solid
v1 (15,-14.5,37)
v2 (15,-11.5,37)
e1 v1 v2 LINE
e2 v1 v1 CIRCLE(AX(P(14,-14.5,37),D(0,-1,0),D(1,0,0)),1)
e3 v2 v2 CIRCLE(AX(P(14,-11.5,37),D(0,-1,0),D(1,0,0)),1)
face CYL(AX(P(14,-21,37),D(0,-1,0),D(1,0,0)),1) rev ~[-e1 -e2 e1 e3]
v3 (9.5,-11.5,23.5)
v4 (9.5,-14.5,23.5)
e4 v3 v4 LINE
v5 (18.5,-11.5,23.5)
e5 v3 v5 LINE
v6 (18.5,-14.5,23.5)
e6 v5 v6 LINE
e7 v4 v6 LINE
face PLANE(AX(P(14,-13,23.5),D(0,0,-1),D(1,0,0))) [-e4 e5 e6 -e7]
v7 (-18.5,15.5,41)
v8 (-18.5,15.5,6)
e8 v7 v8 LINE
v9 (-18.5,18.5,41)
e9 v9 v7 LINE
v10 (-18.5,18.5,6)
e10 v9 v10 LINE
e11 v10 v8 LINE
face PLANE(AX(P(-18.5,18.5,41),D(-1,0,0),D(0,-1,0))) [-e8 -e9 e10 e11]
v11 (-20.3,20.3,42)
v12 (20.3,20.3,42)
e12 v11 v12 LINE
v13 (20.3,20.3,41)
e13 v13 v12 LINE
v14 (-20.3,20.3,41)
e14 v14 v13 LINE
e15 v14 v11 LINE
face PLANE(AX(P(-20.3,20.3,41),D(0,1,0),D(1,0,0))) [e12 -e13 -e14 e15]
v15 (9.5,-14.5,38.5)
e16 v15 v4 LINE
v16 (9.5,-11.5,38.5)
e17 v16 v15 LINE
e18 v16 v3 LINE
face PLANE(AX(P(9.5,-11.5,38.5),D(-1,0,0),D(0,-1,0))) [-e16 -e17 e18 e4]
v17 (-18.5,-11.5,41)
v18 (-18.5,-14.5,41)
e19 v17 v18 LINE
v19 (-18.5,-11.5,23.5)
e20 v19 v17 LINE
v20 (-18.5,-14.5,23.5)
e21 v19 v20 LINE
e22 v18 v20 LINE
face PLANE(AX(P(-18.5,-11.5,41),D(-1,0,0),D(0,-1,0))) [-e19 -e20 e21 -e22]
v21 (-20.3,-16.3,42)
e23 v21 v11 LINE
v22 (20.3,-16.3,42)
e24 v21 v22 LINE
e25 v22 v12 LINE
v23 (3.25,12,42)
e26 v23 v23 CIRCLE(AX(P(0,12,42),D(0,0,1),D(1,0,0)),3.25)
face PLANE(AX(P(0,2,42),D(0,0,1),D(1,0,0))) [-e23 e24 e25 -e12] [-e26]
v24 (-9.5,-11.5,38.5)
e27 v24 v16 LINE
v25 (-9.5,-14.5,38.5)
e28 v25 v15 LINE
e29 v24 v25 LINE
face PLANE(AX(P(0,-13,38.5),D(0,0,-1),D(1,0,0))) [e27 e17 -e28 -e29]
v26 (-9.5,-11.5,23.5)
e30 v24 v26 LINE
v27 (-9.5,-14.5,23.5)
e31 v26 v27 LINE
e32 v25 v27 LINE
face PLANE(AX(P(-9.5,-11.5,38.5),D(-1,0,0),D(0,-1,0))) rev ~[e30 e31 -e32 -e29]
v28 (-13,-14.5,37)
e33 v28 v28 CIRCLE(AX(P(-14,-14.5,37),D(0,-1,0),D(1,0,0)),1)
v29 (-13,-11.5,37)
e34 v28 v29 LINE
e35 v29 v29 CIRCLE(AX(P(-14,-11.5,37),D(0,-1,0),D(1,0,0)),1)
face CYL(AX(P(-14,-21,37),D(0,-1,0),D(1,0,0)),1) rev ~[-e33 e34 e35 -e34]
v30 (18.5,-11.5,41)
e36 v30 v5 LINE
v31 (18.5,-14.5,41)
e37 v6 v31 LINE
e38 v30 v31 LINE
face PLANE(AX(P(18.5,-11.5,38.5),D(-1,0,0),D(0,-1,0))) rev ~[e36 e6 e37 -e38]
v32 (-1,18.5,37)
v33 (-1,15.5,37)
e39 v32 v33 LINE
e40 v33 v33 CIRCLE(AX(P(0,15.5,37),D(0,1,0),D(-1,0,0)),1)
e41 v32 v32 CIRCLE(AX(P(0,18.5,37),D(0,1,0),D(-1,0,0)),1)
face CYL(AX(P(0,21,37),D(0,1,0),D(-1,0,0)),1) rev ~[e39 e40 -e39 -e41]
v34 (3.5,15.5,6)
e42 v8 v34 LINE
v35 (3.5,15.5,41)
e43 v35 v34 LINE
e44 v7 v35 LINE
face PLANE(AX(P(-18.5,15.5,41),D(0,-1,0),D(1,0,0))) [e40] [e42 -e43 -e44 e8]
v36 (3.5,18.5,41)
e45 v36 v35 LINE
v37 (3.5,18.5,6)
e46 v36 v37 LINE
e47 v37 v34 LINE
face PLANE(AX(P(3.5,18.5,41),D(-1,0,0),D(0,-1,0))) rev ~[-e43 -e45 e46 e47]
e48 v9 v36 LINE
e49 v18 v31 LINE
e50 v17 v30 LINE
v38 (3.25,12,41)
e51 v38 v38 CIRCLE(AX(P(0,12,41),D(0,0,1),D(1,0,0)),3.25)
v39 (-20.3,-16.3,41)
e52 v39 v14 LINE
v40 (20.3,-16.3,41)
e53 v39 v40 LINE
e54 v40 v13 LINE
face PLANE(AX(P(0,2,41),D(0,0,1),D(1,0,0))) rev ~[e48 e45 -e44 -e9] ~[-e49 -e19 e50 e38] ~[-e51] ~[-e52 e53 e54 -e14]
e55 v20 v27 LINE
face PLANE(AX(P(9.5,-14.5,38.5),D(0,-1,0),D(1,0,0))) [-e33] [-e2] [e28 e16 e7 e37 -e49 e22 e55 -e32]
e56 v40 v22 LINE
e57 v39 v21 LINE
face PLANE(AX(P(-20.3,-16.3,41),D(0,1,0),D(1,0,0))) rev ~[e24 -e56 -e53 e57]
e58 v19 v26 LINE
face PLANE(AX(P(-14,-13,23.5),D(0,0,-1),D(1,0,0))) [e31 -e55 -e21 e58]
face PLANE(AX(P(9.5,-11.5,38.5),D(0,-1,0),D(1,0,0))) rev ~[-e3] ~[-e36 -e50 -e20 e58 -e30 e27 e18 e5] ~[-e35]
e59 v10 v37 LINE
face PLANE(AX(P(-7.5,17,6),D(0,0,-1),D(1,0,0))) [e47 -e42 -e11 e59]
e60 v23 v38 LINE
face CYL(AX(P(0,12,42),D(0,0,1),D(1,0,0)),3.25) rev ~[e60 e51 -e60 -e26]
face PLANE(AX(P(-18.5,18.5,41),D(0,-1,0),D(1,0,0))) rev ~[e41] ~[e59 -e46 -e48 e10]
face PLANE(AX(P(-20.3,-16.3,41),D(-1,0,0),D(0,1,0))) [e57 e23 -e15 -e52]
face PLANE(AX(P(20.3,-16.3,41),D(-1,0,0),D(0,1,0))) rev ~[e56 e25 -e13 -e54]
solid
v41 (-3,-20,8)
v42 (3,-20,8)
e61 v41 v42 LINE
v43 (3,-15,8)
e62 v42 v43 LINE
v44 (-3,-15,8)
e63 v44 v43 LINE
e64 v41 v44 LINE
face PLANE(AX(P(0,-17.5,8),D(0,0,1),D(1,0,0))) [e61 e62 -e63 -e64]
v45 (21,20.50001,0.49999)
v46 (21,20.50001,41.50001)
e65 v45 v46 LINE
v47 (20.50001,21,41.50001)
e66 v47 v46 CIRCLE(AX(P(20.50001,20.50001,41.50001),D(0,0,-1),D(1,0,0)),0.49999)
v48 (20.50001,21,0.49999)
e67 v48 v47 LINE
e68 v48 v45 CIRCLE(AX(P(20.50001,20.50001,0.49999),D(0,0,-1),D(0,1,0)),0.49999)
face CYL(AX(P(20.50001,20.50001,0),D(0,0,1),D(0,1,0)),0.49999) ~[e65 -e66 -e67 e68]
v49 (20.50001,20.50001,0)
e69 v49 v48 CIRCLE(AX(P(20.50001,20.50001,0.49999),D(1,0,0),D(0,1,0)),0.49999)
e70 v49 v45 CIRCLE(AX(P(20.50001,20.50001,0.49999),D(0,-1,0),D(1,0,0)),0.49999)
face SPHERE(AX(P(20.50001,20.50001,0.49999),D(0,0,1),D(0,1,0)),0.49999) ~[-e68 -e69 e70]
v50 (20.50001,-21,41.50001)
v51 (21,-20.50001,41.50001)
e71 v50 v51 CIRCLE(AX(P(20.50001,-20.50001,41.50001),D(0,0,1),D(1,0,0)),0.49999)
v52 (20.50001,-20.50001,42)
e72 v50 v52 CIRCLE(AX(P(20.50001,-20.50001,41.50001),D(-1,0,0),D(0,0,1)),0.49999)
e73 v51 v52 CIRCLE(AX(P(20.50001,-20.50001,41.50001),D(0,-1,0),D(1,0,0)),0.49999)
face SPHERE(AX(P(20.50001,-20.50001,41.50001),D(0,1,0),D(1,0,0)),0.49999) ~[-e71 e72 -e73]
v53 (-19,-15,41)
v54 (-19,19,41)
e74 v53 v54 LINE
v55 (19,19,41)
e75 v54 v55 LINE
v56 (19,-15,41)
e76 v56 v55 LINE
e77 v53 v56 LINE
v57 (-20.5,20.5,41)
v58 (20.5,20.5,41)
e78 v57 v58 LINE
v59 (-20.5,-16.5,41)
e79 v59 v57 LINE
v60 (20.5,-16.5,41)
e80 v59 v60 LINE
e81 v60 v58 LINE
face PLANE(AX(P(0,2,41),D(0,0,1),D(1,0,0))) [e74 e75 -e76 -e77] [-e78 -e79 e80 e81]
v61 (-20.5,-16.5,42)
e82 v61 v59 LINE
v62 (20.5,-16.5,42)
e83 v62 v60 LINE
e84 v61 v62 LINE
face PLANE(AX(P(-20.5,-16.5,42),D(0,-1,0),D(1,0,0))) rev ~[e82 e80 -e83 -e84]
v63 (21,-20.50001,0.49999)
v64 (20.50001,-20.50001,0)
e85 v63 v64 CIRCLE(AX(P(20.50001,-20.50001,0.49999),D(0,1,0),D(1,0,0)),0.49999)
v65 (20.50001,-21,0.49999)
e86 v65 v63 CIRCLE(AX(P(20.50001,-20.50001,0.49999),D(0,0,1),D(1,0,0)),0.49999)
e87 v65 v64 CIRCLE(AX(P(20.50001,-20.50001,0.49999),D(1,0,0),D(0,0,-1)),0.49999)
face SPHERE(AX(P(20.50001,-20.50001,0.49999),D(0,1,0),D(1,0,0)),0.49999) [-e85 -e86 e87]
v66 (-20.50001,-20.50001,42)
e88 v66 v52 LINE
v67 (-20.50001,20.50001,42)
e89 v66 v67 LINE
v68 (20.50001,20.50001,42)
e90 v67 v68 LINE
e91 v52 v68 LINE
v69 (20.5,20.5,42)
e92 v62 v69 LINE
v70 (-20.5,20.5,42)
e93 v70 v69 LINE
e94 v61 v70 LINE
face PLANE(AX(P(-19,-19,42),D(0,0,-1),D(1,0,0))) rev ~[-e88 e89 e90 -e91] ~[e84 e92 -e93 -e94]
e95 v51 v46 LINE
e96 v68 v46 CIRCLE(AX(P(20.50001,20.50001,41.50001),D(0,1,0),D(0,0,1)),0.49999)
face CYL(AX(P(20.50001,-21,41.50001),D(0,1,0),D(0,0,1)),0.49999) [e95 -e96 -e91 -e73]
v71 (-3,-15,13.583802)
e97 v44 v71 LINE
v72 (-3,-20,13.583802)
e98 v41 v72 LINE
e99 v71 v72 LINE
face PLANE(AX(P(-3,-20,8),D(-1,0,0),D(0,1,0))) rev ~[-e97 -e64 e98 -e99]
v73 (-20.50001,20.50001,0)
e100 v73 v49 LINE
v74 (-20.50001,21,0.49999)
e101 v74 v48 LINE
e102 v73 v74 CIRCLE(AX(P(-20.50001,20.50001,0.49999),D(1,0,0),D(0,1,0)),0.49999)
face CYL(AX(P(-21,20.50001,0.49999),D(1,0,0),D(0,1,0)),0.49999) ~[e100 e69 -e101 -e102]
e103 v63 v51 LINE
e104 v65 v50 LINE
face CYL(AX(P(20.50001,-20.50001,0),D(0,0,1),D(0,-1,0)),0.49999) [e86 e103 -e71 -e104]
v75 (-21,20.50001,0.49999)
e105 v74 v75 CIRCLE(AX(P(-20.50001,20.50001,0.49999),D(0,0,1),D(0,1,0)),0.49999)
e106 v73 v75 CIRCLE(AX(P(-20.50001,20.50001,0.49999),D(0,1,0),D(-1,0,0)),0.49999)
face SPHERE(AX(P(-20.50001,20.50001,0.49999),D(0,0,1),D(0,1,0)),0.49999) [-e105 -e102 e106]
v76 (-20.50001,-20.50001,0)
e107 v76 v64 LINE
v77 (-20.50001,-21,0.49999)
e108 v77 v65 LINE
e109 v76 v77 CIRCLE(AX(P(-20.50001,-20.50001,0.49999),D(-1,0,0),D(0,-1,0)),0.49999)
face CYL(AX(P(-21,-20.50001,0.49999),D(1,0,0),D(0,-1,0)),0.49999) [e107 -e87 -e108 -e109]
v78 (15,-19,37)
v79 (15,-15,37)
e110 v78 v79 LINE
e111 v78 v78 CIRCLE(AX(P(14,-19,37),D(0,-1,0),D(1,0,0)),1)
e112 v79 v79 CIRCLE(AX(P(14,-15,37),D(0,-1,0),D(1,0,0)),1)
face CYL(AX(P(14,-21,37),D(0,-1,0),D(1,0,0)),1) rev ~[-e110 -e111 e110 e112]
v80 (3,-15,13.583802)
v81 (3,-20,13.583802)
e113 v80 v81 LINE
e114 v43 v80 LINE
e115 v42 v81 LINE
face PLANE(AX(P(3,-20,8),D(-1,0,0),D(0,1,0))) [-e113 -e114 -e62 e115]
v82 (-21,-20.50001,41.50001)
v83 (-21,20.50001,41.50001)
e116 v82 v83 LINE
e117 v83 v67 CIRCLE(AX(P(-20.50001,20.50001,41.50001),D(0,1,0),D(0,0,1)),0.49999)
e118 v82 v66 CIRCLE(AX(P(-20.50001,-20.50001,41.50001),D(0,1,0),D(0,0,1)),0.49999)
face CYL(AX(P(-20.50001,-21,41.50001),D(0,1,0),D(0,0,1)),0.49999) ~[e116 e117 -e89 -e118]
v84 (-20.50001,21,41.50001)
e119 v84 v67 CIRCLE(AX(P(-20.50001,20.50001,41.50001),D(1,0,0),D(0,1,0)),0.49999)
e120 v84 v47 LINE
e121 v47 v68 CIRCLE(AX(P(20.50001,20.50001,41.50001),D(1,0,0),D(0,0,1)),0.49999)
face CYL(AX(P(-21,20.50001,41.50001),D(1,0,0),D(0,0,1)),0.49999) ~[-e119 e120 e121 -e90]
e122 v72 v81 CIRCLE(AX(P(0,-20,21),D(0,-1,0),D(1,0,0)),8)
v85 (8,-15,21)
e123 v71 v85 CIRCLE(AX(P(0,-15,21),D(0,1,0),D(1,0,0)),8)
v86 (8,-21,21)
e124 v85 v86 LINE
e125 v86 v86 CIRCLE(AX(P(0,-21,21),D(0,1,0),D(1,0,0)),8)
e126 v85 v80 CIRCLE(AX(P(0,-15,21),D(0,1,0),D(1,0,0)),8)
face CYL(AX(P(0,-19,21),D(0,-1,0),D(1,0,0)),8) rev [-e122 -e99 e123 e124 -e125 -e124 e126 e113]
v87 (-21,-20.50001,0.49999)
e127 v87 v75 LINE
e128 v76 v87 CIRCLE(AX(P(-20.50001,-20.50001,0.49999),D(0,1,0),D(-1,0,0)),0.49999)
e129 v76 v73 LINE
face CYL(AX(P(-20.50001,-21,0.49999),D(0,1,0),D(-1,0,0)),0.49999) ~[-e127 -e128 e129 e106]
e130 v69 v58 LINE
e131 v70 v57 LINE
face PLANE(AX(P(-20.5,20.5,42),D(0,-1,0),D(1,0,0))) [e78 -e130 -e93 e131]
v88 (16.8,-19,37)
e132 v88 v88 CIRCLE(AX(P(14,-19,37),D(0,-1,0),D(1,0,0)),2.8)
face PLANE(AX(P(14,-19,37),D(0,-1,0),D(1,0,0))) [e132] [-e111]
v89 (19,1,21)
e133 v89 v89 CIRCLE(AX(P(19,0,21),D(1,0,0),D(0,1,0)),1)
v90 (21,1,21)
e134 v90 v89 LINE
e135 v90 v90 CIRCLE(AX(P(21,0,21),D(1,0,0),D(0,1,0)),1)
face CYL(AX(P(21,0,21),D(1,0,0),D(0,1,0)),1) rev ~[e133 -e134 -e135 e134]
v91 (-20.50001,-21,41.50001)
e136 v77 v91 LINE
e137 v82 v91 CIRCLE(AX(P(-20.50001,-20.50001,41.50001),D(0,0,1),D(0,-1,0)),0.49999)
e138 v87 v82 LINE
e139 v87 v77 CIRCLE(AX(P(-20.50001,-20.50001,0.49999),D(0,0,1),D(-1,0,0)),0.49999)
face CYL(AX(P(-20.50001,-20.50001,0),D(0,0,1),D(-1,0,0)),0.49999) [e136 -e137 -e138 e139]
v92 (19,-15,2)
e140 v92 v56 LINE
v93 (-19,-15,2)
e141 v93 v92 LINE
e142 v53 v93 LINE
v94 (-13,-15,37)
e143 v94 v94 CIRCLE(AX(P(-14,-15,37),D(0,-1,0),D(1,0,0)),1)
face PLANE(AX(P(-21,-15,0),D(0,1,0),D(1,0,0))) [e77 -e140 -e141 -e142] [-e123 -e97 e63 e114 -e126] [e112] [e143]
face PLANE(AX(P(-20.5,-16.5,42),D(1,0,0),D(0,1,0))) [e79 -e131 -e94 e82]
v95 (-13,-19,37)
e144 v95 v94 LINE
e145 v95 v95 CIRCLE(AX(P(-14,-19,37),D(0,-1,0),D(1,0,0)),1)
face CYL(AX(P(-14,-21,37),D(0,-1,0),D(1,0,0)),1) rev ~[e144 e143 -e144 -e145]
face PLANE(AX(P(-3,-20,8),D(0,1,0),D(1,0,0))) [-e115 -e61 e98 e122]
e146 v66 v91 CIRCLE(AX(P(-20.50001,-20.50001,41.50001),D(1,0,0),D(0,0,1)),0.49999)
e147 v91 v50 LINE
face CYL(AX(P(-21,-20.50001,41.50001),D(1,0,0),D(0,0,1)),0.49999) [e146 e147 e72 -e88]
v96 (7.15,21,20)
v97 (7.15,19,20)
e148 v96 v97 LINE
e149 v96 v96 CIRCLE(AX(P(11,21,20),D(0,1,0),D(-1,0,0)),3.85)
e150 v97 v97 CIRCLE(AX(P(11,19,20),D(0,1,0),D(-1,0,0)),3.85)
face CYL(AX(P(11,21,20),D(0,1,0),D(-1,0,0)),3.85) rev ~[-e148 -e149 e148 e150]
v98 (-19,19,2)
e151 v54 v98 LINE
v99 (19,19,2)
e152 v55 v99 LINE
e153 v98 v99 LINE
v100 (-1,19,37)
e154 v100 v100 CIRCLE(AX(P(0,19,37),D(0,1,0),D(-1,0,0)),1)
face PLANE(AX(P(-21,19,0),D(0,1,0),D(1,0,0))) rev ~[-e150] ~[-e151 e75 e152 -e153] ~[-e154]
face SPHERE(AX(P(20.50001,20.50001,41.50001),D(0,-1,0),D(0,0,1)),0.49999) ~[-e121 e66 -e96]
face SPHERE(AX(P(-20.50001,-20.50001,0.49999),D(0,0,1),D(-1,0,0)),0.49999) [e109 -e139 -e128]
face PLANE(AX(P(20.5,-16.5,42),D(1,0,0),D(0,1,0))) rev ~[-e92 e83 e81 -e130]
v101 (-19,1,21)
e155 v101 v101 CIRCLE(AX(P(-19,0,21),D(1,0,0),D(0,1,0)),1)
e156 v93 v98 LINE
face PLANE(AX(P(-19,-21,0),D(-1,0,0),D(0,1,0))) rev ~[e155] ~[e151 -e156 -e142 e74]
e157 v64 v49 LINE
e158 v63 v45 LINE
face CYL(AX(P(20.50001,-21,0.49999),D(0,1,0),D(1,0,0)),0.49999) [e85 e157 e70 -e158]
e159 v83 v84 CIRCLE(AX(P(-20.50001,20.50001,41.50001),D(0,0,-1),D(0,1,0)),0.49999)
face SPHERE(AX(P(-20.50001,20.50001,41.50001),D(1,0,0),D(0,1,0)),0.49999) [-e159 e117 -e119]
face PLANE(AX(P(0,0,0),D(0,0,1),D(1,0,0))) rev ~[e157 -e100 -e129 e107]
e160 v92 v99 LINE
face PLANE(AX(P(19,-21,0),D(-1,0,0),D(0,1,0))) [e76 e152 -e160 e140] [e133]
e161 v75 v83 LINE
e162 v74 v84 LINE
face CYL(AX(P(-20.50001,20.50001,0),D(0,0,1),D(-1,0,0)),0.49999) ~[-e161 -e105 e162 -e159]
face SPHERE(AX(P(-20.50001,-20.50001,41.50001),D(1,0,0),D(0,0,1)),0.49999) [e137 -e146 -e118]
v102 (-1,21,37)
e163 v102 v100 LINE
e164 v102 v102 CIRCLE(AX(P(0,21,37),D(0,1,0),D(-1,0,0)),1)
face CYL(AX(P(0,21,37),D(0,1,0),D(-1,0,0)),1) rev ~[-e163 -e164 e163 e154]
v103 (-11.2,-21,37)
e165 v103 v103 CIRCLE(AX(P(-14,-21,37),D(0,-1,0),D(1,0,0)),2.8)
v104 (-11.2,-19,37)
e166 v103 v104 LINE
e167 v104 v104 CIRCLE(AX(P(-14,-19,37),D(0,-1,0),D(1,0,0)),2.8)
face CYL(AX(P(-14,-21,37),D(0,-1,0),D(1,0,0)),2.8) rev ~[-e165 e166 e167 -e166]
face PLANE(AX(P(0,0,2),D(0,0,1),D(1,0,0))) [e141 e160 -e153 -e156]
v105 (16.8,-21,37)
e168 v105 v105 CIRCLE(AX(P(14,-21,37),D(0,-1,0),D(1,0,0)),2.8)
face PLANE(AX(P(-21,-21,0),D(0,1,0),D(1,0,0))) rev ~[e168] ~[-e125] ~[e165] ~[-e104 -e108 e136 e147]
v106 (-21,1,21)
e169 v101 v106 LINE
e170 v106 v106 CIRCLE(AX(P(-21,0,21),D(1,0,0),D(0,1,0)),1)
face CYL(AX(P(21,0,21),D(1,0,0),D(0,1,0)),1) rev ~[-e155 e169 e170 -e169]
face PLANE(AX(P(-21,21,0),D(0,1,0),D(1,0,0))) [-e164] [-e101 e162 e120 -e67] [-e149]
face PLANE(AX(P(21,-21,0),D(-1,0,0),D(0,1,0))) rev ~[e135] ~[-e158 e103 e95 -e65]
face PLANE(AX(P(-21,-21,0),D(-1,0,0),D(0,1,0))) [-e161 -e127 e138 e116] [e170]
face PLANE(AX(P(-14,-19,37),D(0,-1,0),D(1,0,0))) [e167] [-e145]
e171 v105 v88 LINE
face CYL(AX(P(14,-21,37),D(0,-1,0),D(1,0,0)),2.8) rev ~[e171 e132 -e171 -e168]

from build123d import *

# Parameters (mm, degrees)
F0_W      = 42
F0_H      = 42
F1_DEPTH  = 42
F2_T      = -2
F3_R      = 8
F4_DEPTH  = 21.001
F5_DEPTH  = 4
F7_W      = 6
F7_H      = 5
F8_DEPTH  = 5.5848015129
F9_R      = 3.85
F10_DEPTH = 2
F11_W     = 41
F11_H     = 37
F12_DEPTH = 1
F13_W     = 40.6
F13_H     = 36.6
F14_DEPTH = 1
F15_W     = 22
F15_H     = 3
F16_DEPTH = 35
F17_W     = 37
F17_H     = 3
F18_DEPTH = 2.5
F19_W     = 9
F19_H     = 3
F20_DEPTH = 15
F21_R     = 1
F22_DEPTH = 10
F23_R     = 1
F24_DEPTH = 25
F25_R     = 2.8
F26_DEPTH = 2
F27_R     = 1
F28_DEPTH = 42.001
F29_R     = 3.25
F30_DEPTH = 1
F31_R     = 0.49999


# Not quite as in the source:
# - a fillet or chamfer is up to 0.001 mm smaller than in the source, because OpenCascade refuses the exact size


with BuildPart() as f1:
    # F0 (on Top) → F1 (new body)
    with BuildSketch(Plane.XY):
        Rectangle(F0_W, F0_H)
    extrude(amount=F1_DEPTH)

    # F2
    f2_openings = [f1.faces().sort_by_distance(p)[0] for p in [
        (0, 0, 42),
    ]]
    offset(amount=F2_T, openings=f2_openings)

    # F3 (on Front) → F4 (cut, through all)
    with BuildSketch(Plane.XZ):
        with Locations((0, 21)):
            Circle(F3_R)
    extrude(amount=F4_DEPTH, mode=Mode.SUBTRACT)

    # F5 (add): a face of the model
    f5_faces = [f1.faces().sort_by_distance(p)[0] for p in [
        (0, -19, 41.448275431),
    ]]
    extrude(f5_faces, amount=F5_DEPTH)

    # F7 (on offset) → F8 (cut, through all)
    with BuildSketch(Plane.XY.offset(8)):
        with Locations((0, -17.5)):
            Rectangle(F7_W, F7_H)
    extrude(amount=F8_DEPTH, mode=Mode.SUBTRACT)

    # F9 (on face) → F10 (cut, through all)
    with BuildSketch(Plane(origin=(0, 21, 0), x_dir=(-1, 0, 0), z_dir=(0, 1, 0))):
        with Locations((-11, 20)):
            Circle(F9_R)
    extrude(amount=-F10_DEPTH, mode=Mode.SUBTRACT)

    # F11 (on face) → F12 (cut)
    with BuildSketch(Plane.XY.offset(42)):
        with Locations((0, 2)):
            Rectangle(F11_W, F11_H)
    extrude(amount=-F12_DEPTH, mode=Mode.SUBTRACT)


with BuildPart() as f14:
    # F13 (on face) → F14 (new body, through all)
    with BuildSketch(Plane.XY.offset(41)):
        with Locations((0, 2)):
            Rectangle(F13_W, F13_H)
    extrude(amount=F14_DEPTH)

    # F15 (on face) → F16 (join)
    with BuildSketch(Plane(origin=(0, 0, 41), x_dir=(1, 0, 0), z_dir=(0, 0, -1))):
        with Locations((-7.5, -17)):
            Rectangle(F15_W, F15_H)
    extrude(amount=F16_DEPTH)

    # F17 (on face) → F18 (join)
    with BuildSketch(Plane(origin=(0, 0, 41), x_dir=(1, 0, 0), z_dir=(0, 0, -1))):
        with Locations((0, 13)):
            Rectangle(F17_W, F17_H)
    extrude(amount=F18_DEPTH)

    # F19 (on face) → F20 (join)
    with BuildSketch(Plane(origin=(0, 0, 38.5), x_dir=(1, 0, 0), z_dir=(0, 0, -1))):
        with Locations((14, 13)):
            Rectangle(F19_W, F19_H)
        with Locations((-14, 13)):
            Rectangle(F19_W, F19_H)
    extrude(amount=F20_DEPTH)


with BuildPart() as f22_tool:
    # F21 (on face) → F22 (new body)
    with BuildSketch(Plane(origin=(0, 21, 0), x_dir=(-1, 0, 0), z_dir=(0, 1, 0))):
        with Locations((0, 37)):
            Circle(F21_R)
    extrude(amount=-F22_DEPTH)


with BuildPart() as f1_1:
    add(f1.part)

    # F22: cut by f22_tool
    add(f22_tool.part, mode=Mode.SUBTRACT)


with BuildPart() as f14_1:
    add(f14.part)

    # F22: cut by f22_tool
    add(f22_tool.part, mode=Mode.SUBTRACT)


with BuildPart() as f24_tool:
    # F23 (on face) → F24 (new body)
    with BuildSketch(Plane.XZ.offset(21)):
        with Locations((-14, 37)):
            Circle(F23_R)
        with Locations((14, 37)):
            Circle(F23_R)
    extrude(amount=-F24_DEPTH)


with BuildPart() as f1_2:
    add(f1_1.part)

    # F24: cut by f24_tool
    add(f24_tool.part, mode=Mode.SUBTRACT)

    # F25 (on face) → F26 (cut)
    with BuildSketch(Plane.XZ.offset(21)):
        with Locations((14, 37)):
            Circle(F25_R)
        with Locations((-14, 37)):
            Circle(F25_R)
    extrude(amount=-F26_DEPTH, mode=Mode.SUBTRACT)

    # F27 (on face) → F28 (cut, through all)
    with BuildSketch(Plane.YZ.offset(21)):
        with Locations((0, 21)):
            Circle(F27_R)
    extrude(amount=-F28_DEPTH, mode=Mode.SUBTRACT)

    # F31 (radius 0.5 in the source; OpenCascade refuses exactly that, so slightly less here)
    f31_edges = [f1_2.edges().sort_by_distance(p)[0] for p in [
        (21, 0, 42),
        (0, 21, 42),
        (21, 21, 21),
        (-21, 21, 21),
        (0, 21, 0),
        (21, 0, 0),
        (21, -21, 21),
        (0, -21, 42),
        (-21, 0, 42),
        (-21, -21, 21),
        (-21, 0, 0),
        (0, -21, 0),
    ]]
    fillet(f31_edges, radius=F31_R)


with BuildPart() as f14_2:
    add(f14_1.part)

    # F24: cut by f24_tool
    add(f24_tool.part, mode=Mode.SUBTRACT)

    # F29 (on face) → F30 (cut, through all)
    with BuildSketch(Plane.XY.offset(42)):
        with Locations((0, 12)):
            Circle(F29_R)
    extrude(amount=-F30_DEPTH, mode=Mode.SUBTRACT)


solid = Compound([f1_2.part, f14_2.part])
